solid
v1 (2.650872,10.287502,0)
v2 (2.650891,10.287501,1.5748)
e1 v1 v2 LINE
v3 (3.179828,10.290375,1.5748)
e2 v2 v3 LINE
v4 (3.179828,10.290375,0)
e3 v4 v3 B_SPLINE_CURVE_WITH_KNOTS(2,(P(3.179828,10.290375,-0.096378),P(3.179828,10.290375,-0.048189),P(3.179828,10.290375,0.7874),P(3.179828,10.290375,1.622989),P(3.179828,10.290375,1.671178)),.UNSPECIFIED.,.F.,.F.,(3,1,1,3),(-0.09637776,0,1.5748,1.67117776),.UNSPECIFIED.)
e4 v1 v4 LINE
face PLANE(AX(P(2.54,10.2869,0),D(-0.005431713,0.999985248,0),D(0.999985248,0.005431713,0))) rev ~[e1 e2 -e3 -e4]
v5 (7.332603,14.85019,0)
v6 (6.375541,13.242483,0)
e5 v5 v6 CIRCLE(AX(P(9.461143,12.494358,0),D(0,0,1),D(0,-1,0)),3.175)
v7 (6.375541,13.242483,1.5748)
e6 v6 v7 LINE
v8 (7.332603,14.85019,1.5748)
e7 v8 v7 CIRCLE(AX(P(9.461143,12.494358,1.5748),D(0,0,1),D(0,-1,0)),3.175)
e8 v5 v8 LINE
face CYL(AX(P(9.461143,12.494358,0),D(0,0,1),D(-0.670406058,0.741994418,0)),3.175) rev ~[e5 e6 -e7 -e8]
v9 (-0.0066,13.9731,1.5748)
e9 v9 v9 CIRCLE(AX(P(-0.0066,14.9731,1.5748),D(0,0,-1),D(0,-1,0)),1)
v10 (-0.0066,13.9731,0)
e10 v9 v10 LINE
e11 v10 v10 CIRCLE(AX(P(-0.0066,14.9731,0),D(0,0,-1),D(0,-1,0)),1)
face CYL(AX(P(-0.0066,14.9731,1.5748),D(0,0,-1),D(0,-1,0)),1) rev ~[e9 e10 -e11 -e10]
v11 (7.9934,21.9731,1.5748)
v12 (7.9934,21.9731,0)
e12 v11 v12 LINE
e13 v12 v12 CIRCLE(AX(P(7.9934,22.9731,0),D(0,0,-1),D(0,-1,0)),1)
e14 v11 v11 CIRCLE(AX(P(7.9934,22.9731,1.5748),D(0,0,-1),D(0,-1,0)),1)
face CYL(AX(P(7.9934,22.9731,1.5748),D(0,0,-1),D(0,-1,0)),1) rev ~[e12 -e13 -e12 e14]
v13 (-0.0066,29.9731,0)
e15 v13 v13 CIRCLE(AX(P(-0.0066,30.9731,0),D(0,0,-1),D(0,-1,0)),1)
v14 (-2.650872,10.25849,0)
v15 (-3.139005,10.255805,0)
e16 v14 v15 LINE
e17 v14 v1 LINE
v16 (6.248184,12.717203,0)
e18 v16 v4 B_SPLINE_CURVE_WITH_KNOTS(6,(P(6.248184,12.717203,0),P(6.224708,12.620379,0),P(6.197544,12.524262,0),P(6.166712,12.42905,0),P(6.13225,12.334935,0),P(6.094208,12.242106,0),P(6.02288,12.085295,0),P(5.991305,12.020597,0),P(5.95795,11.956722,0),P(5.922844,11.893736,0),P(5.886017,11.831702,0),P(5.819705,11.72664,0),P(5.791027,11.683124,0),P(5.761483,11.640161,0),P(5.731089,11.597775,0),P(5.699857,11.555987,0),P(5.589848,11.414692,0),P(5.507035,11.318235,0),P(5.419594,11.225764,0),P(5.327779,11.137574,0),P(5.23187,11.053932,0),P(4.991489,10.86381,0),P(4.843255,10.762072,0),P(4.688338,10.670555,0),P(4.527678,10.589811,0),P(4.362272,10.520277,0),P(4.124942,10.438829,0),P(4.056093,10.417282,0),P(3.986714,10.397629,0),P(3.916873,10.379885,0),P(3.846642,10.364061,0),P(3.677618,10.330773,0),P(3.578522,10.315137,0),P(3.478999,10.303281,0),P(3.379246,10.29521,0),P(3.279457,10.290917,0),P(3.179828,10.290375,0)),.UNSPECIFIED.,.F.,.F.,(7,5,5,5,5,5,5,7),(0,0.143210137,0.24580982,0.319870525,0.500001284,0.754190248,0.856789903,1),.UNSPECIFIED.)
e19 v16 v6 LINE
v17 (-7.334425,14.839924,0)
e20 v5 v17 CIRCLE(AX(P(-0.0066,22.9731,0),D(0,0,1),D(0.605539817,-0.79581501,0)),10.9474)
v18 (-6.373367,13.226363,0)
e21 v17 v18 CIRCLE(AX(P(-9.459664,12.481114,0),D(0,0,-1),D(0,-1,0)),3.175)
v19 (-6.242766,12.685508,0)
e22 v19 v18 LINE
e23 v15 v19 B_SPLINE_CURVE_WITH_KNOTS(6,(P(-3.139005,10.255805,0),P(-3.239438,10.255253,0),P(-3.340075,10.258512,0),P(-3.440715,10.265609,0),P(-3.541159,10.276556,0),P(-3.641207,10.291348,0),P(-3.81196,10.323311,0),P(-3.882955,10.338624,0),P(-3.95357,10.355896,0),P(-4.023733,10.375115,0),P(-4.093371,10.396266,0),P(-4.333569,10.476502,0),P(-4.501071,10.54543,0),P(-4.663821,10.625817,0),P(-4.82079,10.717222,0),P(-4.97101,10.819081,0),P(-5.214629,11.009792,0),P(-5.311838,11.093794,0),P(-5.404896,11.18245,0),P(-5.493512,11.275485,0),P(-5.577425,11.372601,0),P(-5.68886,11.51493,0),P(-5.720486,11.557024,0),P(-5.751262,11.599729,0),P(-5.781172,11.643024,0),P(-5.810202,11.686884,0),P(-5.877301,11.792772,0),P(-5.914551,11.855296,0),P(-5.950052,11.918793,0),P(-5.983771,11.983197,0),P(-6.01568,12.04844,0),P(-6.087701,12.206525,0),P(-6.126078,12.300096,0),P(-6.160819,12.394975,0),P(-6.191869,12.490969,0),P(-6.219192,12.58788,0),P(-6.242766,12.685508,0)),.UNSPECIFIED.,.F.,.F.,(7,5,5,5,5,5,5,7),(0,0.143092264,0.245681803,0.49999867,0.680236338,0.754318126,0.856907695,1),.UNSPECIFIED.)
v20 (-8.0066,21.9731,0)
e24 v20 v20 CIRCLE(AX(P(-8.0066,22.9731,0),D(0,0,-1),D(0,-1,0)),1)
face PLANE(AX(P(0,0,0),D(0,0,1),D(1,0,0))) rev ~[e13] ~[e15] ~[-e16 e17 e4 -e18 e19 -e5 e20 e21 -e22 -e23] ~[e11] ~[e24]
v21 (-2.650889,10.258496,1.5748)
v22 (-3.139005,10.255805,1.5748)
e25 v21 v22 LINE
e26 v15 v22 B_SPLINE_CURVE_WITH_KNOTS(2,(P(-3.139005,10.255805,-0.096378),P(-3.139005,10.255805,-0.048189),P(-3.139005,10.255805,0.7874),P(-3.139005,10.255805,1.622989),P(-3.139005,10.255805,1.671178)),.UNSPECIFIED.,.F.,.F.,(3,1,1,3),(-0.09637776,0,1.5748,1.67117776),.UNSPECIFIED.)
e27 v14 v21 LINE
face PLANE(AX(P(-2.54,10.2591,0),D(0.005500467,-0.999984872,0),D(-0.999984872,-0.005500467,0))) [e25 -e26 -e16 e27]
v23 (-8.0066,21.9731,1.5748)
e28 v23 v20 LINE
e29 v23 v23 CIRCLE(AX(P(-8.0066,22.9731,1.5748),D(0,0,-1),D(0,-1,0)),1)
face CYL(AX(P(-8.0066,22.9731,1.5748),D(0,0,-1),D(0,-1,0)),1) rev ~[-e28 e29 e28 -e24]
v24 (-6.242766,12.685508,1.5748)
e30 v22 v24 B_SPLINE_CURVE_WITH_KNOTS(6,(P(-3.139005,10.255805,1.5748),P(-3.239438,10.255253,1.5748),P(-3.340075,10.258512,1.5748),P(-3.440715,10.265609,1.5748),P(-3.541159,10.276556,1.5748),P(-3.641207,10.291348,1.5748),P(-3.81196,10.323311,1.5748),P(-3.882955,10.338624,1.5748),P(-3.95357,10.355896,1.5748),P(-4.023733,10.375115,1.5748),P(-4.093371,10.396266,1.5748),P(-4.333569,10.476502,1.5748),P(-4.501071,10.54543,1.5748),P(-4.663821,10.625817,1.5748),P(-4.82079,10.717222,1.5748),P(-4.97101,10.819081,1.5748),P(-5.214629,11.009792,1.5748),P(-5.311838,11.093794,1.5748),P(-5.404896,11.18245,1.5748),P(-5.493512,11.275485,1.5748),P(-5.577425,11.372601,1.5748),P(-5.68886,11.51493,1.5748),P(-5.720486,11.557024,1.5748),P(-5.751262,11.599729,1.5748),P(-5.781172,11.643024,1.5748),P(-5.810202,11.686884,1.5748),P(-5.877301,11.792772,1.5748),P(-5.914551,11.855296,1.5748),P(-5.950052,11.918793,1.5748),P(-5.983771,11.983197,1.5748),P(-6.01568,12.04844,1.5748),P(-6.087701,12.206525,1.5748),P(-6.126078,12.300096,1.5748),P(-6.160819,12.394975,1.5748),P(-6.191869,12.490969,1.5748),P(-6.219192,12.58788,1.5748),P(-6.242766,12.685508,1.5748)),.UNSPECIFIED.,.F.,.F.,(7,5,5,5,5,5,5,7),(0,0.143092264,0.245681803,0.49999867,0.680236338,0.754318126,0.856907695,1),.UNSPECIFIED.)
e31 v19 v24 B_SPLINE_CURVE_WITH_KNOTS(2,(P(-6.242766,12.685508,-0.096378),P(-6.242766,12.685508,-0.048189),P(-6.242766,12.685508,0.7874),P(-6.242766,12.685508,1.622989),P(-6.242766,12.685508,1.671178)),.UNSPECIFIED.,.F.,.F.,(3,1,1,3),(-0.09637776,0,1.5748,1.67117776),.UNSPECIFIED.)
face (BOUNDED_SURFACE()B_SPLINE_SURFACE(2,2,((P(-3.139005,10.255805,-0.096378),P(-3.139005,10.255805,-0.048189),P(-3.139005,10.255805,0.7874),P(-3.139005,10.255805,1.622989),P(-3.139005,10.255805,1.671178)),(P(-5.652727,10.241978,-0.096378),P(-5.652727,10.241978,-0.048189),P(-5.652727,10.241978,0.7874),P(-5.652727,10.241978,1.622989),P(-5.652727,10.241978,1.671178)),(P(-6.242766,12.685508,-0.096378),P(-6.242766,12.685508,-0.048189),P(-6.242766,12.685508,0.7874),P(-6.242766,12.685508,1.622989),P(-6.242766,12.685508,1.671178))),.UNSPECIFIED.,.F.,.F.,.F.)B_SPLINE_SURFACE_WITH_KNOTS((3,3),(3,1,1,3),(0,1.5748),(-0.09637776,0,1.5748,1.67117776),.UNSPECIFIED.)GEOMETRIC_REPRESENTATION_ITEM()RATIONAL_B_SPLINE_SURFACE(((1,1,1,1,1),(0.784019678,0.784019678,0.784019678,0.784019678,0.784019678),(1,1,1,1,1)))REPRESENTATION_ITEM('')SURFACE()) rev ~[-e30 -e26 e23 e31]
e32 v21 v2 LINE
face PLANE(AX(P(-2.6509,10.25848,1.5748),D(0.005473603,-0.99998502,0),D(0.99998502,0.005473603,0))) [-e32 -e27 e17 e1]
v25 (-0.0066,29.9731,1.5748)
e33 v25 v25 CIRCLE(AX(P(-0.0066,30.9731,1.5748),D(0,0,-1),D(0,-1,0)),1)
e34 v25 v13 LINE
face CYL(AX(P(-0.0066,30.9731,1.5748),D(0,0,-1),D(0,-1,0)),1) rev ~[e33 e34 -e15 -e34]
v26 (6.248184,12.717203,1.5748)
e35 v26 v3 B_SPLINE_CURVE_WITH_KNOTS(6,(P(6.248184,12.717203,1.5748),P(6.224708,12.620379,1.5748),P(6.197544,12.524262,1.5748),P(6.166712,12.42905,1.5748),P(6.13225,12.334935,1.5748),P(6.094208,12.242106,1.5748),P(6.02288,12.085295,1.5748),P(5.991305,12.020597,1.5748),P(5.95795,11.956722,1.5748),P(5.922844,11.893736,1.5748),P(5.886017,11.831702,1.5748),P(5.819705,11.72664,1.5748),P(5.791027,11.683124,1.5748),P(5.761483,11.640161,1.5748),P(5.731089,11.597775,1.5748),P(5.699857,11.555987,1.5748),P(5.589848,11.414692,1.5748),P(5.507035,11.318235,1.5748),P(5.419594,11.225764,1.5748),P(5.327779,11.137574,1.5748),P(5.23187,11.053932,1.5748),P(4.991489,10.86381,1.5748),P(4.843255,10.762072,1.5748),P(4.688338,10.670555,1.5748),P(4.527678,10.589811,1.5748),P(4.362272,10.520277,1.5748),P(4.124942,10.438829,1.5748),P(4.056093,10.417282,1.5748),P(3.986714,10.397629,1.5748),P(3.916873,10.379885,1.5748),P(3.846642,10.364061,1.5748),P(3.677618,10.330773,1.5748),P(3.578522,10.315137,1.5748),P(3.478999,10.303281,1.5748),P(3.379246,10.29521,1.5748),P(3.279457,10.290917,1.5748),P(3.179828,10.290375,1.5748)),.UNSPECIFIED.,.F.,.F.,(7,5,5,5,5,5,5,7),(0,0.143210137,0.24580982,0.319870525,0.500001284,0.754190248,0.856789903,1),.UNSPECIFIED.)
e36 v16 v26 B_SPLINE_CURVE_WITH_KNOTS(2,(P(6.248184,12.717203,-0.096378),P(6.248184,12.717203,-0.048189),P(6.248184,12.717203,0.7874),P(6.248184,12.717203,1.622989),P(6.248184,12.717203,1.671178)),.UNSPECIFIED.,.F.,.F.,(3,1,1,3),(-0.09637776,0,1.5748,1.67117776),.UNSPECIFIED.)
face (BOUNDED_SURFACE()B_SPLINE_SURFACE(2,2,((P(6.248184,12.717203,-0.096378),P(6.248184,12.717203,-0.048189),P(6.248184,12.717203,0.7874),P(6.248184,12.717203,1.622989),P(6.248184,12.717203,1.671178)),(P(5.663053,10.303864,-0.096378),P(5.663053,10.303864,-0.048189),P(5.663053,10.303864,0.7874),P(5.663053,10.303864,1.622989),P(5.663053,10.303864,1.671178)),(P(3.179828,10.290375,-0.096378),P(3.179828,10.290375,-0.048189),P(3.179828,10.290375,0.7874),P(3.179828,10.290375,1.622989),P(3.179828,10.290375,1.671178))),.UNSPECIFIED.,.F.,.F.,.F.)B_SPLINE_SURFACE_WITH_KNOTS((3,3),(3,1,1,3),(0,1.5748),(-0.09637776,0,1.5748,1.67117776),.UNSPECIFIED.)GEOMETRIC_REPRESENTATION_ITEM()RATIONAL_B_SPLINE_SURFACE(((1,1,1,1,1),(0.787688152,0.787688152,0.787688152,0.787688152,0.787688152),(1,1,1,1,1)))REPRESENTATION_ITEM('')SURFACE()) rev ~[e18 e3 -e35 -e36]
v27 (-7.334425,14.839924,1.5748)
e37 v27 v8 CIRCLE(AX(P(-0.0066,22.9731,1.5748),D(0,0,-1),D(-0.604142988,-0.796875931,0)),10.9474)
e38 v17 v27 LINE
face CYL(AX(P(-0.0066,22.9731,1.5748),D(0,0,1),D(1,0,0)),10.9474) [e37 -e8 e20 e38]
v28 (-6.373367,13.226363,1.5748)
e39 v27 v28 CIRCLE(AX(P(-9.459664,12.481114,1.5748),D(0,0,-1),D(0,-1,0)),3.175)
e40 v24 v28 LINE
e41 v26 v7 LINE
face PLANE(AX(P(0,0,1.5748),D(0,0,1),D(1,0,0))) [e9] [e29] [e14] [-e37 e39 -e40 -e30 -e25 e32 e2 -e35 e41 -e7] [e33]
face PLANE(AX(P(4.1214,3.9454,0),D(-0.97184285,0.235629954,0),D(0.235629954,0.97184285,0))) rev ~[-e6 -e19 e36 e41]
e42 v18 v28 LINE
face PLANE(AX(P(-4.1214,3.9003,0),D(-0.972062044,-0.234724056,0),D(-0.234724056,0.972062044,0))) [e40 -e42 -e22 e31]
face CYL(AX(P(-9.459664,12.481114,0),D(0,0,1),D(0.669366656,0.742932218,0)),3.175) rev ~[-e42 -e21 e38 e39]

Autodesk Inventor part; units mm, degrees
ref_plane "YZ Plane" through (0, 0, 0) normal (1, 0, 0) x (0, 1, 0)
ref_plane "XZ Plane" through (0, 0, 0) normal (0, 1, 0) x (-1, 0, 0)
ref_plane "XY Plane" through (0, 0, 0) normal (0, 0, 1) x (1, 0, 0)
sketch "Sketch1" plane through (0, 0, 0) normal (0, 0, 1) x (1, 0, 0)
  line L0 (-2.54, -8.19) -> (2.54, -8.19)
  line L1 (2.54, -8.19) -> (2.54, 8.19)
  line L2 (-2.54, 8.19) -> (-2.54, -8.19)
  line L3 (-2.54, -8.19) -> (2.54, 8.19) construction
  line L4 (2.54, -8.19) -> (-2.54, 8.19) construction
  circle A0 centre (0, 16.6545) radius 2.5 construction
  circle A1 centre (0, 16.6545) radius 5
  arc A2 (6.8029, 15.0051) -> (-6.8044, 15.0114) centre (0, 16.6545) ccw
  line L5 (-2.54, 8.19) -> (-2.54, 10.2591)
  line L6 (2.54, 8.19) -> (2.54, 10.2869)
  line L7 (0, 0) -> (0, 10.7842) construction
  line L8 (-2.54, 10.2591) -> (-3.9944, 10.2511)
  line L9 (2.54, 10.2869) -> (3.9944, 10.2948)
  line L10 (-3.9944, 10.2511) -> (-4.1214, 3.9003)
  line L11 (3.9944, 10.2948) -> (4.1214, 3.9454)
  line L12 (-4.1214, 3.9003) -> (-6.8044, 15.0114)
  line L13 (4.1214, 3.9454) -> (6.8029, 15.0051)
  line L14 (0, 0) -> (0, 22.9511) construction
  point P0 (-3.2672, 10.2551)
  dimension "d2" = 5
  dimension "d3" = 10
  dimension "d4" = 14
  dimension "d8" = 1.5815
  dimension "d9" = 1.5815
  dimension "d10" = 6.35
  dimension "d11" = 6.35
  dimension "d18" = 1.4545
  dimension "d19" = 1.4545
  dimension "d31" = 2.54
  dimension "d32" = 2.54
  dimension "d33" = 0
extrude "Plate1" add sketch "Sketch1" along normal blind 1.5748
sketch "Sketch2" plane through (0, 0, 0) normal (0, 0, -1) x (-1, 0, 0)
  circle A0 centre (0, 16.6545) radius 5 projected
  line L0 (-3.9944, 10.2948) -> (-4.1214, 3.9454) projected
  line L1 (-2.54, 10.2869) -> (-3.9944, 10.2948) projected
  line L2 (-2.54, -8.19) -> (-2.54, 10.2869) projected
  line L3 (2.54, -8.19) -> (-2.54, -8.19) projected
  line L4 (2.54, 10.2591) -> (2.54, -8.19) projected
  line L5 (3.9944, 10.2511) -> (2.54, 10.2591) projected
  line L6 (4.1214, 3.9003) -> (3.9944, 10.2511) projected
  line L7 (6.8044, 15.0114) -> (4.1214, 3.9003) projected
  arc A1 (6.8044, 15.0114) -> (-6.8029, 15.0051) centre (0, 16.6545) ccw projected
  line L8 (-4.1214, 3.9454) -> (-6.8029, 15.0051) projected
  line L9 (-1.5875, -17.19) -> (1.5875, -17.19)
  line L10 (1.5875, -17.19) -> (1.5875, 0.81)
  line L11 (1.5875, 0.81) -> (-1.5875, 0.81)
  line L12 (-1.5875, 0.81) -> (-1.5875, -17.19)
  line L13 (-1.5875, -17.19) -> (1.5875, 0.81) construction
  line L14 (1.5875, -17.19) -> (-1.5875, 0.81) construction
  point P0 (0, 0)
  point P1 (0, -8.19)
  dimension "d14" = 3.175
extrude "Extrusion1" cut sketch "Sketch2" against normal blind 25.4 contours L12 L11 L10 L3 | L3 L10 L9 L12
sketch "Sketch3" plane through (0, 0, 1.5748) normal (0, 0, 1) x (1, 0, 0)
  circle A0 centre (-37.757, 0) radius 3
  line L0 (-39.3445, -2.5456) -> (-36.1695, -2.5456)
  line L1 (-36.1695, -2.5456) -> (-36.1695, 2.5456)
  line L2 (-36.1695, 2.5456) -> (-39.3445, 2.5456)
  line L3 (-39.3445, 2.5456) -> (-39.3445, -2.5456)
  line L4 (-39.3445, -2.5456) -> (-36.1695, 2.5456) construction
  line L5 (-36.1695, -2.5456) -> (-39.3445, 2.5456) construction
  circle A1 centre (-37.757, 0) radius 4
  point P0 (0, 0)
  point P1 (-37.757, 3)
  point P2 (-37.757, 4)
  dimension "d35" = 8
  dimension "d28" = 6
  dimension "d29" = 3.175
  dimension "d30" = 5.0911
  dimension "d34" = 0.4545
  dimension "d36" = 1.4545
fillet "Fillet4" radius 0.381 6 edges at (-4.1214, 3.9003, 0.7874) (4.1214, 3.9454, 0.7874) (-2.54, -8.19, 0.7874) (-1.5875, -8.19, 0.7874) (1.5875, -8.19, 0.7874) (2.54, -8.19, 0.7874)
sketch "Sketch4" plane through (0, 0, 1.5748) normal (0, 0, 1) x (1, 0, 0)
  arc A0 (2.159, -8.19) -> (2.54, -7.809) centre (2.159, -7.809) ccw projected
  line L0 (2.54, 10.2869) -> (2.54, -7.809) projected
  line L1 (3.9944, 10.2948) -> (2.54, 10.2869) projected
  line L2 (4.0627, 6.8835) -> (3.9944, 10.2948) projected
  arc A1 (4.0627, 6.8835) -> (4.8139, 6.8013) centre (4.4436, 6.8911) ccw projected
  line L3 (6.8029, 15.0051) -> (4.8139, 6.8013) projected
  arc A2 (6.8029, 15.0051) -> (-6.8044, 15.0114) centre (0, 16.6545) ccw projected
  line L4 (-4.8137, 6.7674) -> (-6.8044, 15.0114) projected
  arc A3 (-4.8137, 6.7674) -> (-4.0625, 6.8492) centre (-4.4434, 6.8568) ccw projected
  line L5 (-3.9944, 10.2511) -> (-4.0625, 6.8492) projected
  line L6 (-2.54, 10.2591) -> (-3.9944, 10.2511) projected
  line L7 (-2.54, -7.809) -> (-2.54, 10.2591) projected
  arc A4 (-2.54, -7.809) -> (-2.159, -8.19) centre (-2.159, -7.809) ccw projected
  line L8 (-1.9685, -8.19) -> (-2.159, -8.19) projected
  arc A5 (-1.9685, -8.19) -> (-1.5875, -7.809) centre (-1.9685, -7.809) ccw projected
  line L9 (-1.5875, -7.809) -> (-1.5875, 0.81) projected
  line L10 (-1.5875, 0.81) -> (1.5875, 0.81) projected
  line L11 (1.5875, 0.81) -> (1.5875, -7.809) projected
  arc A6 (1.5875, -7.809) -> (1.9685, -8.19) centre (1.9685, -7.809) ccw projected
  line L12 (2.159, -8.19) -> (1.9685, -8.19) projected
  circle A7 centre (0, 16.6545) radius 5 projected
  point P0 (0, 0)
extrude "Extrusion2" add sketch "Sketch4" against normal up to surface (1.5748 mm away) contours A7
sketch "Sketch5" plane through (0, 0, 1.5748) normal (0, 0, 1) x (1, 0, 0)
  arc A0 (2.159, -8.19) -> (2.54, -7.809) centre (2.159, -7.809) ccw projected
  line L0 (2.54, 10.2869) -> (2.54, -7.809) projected
  line L1 (3.9944, 10.2948) -> (2.54, 10.2869) projected
  line L2 (4.0627, 6.8835) -> (3.9944, 10.2948) projected
  arc A1 (4.0627, 6.8835) -> (4.8139, 6.8013) centre (4.4436, 6.8911) ccw projected
  line L3 (6.8029, 15.0051) -> (4.8139, 6.8013) projected
  arc A2 (6.8029, 15.0051) -> (-6.8044, 15.0114) centre (0, 16.6545) ccw projected
  line L4 (-4.8137, 6.7674) -> (-6.8044, 15.0114) projected
  arc A3 (-4.8137, 6.7674) -> (-4.0625, 6.8492) centre (-4.4434, 6.8568) ccw projected
  line L5 (-3.9944, 10.2511) -> (-4.0625, 6.8492) projected
  line L6 (-2.54, 10.2591) -> (-3.9944, 10.2511) projected
  line L7 (-2.54, -7.809) -> (-2.54, 10.2591) projected
  arc A4 (-2.54, -7.809) -> (-2.159, -8.19) centre (-2.159, -7.809) ccw projected
  line L8 (-1.9685, -8.19) -> (-2.159, -8.19) projected
  arc A5 (-1.9685, -8.19) -> (-1.5875, -7.809) centre (-1.9685, -7.809) ccw projected
  line L9 (-1.5875, -7.809) -> (-1.5875, 0.81) projected
  line L10 (-1.5875, 0.81) -> (1.5875, 0.81) projected
  line L11 (1.5875, 0.81) -> (1.5875, -7.809) projected
  arc A6 (1.5875, -7.809) -> (1.9685, -8.19) centre (1.9685, -7.809) ccw projected
  line L12 (2.159, -8.19) -> (1.9685, -8.19) projected
  arc A7 (1.5644, 14.7045) -> (-1.5644, 14.7045) centre (0, 16.6545) ccw
  line L13 (1.5644, 14.7045) -> (-1.5644, 14.7045)
  point P0 (0, 0)
  point P1 (0, 19.1545)
  dimension "d40" = 5
  dimension "d44" = 4.45
extrude "Extrusion3" cut sketch "Sketch5" against normal blind 25.4 contours L13 A7
sketch "Sketch6" plane through (0, 0, 1.5748) normal (0, 0, 1) x (1, 0, 0)
  circle A0 centre (-0.0066, 22.9731) radius 10.9474
  line L0 (3.9944, 10.2948) -> (2.54, 10.2869) projected
  point P0 (0, 0)
  dimension "d45" = 21.8948
  dimension "d46" = 12.7
extrude "Extrusion4" add sketch "Sketch6" against normal up to surface (1.5748 mm away)
fillet "Fillet5" radius 3.175 2 edges at (-6.6204, 14.2495, 0.7874) (6.6225, 14.2611, 0.7874)
chamfer "Chamfer3" distance 3.175 angle 2 1 edges at (-2.54, 10.2591, 0.7874) measured on face at (-2.54, 4.2364, 0.5249)
chamfer "Chamfer4" distance 3.175 angle 2 1 edges at (2.54, 10.2869, 0.7874) measured on face at (2.54, -1.7771, 1.0499)
sketch "Sketch7" plane through (0, 0, 1.5748) normal (0, 0, 1) x (1, 0, 0)
  line L0 (-4.8137, 6.7674) -> (-6.3734, 13.2264) projected
  arc A0 (-4.8137, 6.7674) -> (-4.0625, 6.8492) centre (-4.4434, 6.8568) ccw projected
  line L1 (-3.9944, 10.2511) -> (-4.0625, 6.8492) projected
  line L2 (-2.6509, 10.2585) -> (-3.9944, 10.2511) projected
  line L3 (-2.54, 7.0841) -> (-2.6509, 10.2585) projected
  line L4 (-2.54, -7.809) -> (-2.54, 7.0841) projected
  arc A1 (-2.54, -7.809) -> (-2.159, -8.19) centre (-2.159, -7.809) ccw projected
  line L5 (-1.9685, -8.19) -> (-2.159, -8.19) projected
  arc A2 (-1.9685, -8.19) -> (-1.5875, -7.809) centre (-1.9685, -7.809) ccw projected
  line L6 (-1.5875, -7.809) -> (-1.5875, 0.81) projected
  line L7 (-1.5875, 0.81) -> (1.5875, 0.81) projected
  line L8 (1.5875, 0.81) -> (1.5875, -7.809) projected
  arc A3 (1.5875, -7.809) -> (1.9685, -8.19) centre (1.9685, -7.809) ccw projected
  line L9 (2.159, -8.19) -> (1.9685, -8.19) projected
  arc A4 (2.159, -8.19) -> (2.54, -7.809) centre (2.159, -7.809) ccw projected
  line L10 (2.54, 7.1119) -> (2.54, -7.809) projected
  line L11 (2.6509, 10.2875) -> (2.54, 7.1119) projected
  line L12 (3.9944, 10.2948) -> (2.6509, 10.2875) projected
  line L13 (4.0627, 6.8835) -> (3.9944, 10.2948) projected
  arc A5 (4.0627, 6.8835) -> (4.8139, 6.8013) centre (4.4436, 6.8911) ccw projected
  line L14 (6.3756, 13.2425) -> (4.8139, 6.8013) projected
  arc A6 (7.3326, 14.8503) -> (6.3756, 13.2425) centre (9.4612, 12.4944) ccw projected
  arc A7 (7.3326, 14.8503) -> (-7.3345, 14.84) centre (-0.0066, 22.9731) ccw projected
  arc A8 (-6.3734, 13.2264) -> (-7.3345, 14.84) centre (-9.4597, 12.4812) ccw projected
  circle A9 centre (-0.0066, 22.9731) radius 8
  point P0 (0, 0)
  point P1 (-0.0066, 14.9731)
  point P2 (-0.0066, 30.9731)
  point P3 (-8.0066, 22.9731)
  point P4 (7.9934, 22.9731)
  dimension "d56" = 16
hole "Hole1" at (-0.0066, 14.9731, 1.5748) at (-0.0066, 30.9731, 1.5748) at (-8.0066, 22.9731, 1.5748) at (7.9934, 22.9731, 1.5748) direction (0, 0, -1) diameter 2 end through all
sketch "Sketch8" plane through (0, 0, 1.5748) normal (0, 0, 1) x (1, 0, 0)
  circle A0 centre (-8.0066, 22.9731) radius 1 projected
  circle A1 centre (-0.0066, 14.9731) radius 1 projected
  circle A2 centre (-0.0066, 30.9731) radius 1 projected
  circle A3 centre (7.9934, 22.9731) radius 1 projected
  line L0 (-4.8137, 6.7674) -> (-6.3734, 13.2264) projected
  arc A4 (-4.8137, 6.7674) -> (-4.0625, 6.8492) centre (-4.4434, 6.8568) ccw projected
  line L1 (-3.9944, 10.2511) -> (-4.0625, 6.8492) projected
  line L2 (-2.6509, 10.2585) -> (-3.9944, 10.2511) projected
  line L3 (-2.54, 7.0841) -> (-2.6509, 10.2585) projected
  line L4 (-2.54, -7.809) -> (-2.54, 7.0841) projected
  arc A5 (-2.54, -7.809) -> (-2.159, -8.19) centre (-2.159, -7.809) ccw projected
  line L5 (-1.9685, -8.19) -> (-2.159, -8.19) projected
  arc A6 (-1.9685, -8.19) -> (-1.5875, -7.809) centre (-1.9685, -7.809) ccw projected
  line L6 (-1.5875, -7.809) -> (-1.5875, 0.81) projected
  line L7 (-1.5875, 0.81) -> (1.5875, 0.81) projected
  line L8 (1.5875, 0.81) -> (1.5875, -7.809) projected
  arc A7 (1.5875, -7.809) -> (1.9685, -8.19) centre (1.9685, -7.809) ccw projected
  line L9 (2.159, -8.19) -> (1.9685, -8.19) projected
  arc A8 (2.159, -8.19) -> (2.54, -7.809) centre (2.159, -7.809) ccw projected
  line L10 (2.54, 7.1119) -> (2.54, -7.809) projected
  line L11 (2.6509, 10.2875) -> (2.54, 7.1119) projected
  line L12 (3.9944, 10.2948) -> (2.6509, 10.2875) projected
  line L13 (4.0627, 6.8835) -> (3.9944, 10.2948) projected
  arc A9 (4.0627, 6.8835) -> (4.8139, 6.8013) centre (4.4436, 6.8911) ccw projected
  line L14 (6.3756, 13.2425) -> (4.8139, 6.8013) projected
  arc A10 (7.3326, 14.8503) -> (6.3756, 13.2425) centre (9.4612, 12.4944) ccw projected
  arc A11 (7.3326, 14.8503) -> (-7.3345, 14.84) centre (-0.0066, 22.9731) ccw projected
  arc A12 (-6.3734, 13.2264) -> (-7.3345, 14.84) centre (-9.4597, 12.4812) ccw projected
  line L15 (-15.0886, 10.1904) -> (17.7412, 10.3701)
  line L16 (17.7412, 10.3701) -> (17.8596, -11.273)
  line L17 (17.8596, -11.273) -> (-14.9701, -11.4526)
  line L18 (-14.9701, -11.4526) -> (-15.0886, 10.1904)
  point P0 (0, 0)
extrude "Extrusion5" cut sketch "Sketch8" against normal blind 25.4 contours A4 L1 L2 L3 L4 A5 L5 A6 L6 L7 L8 A7 L9 A8 L10 L11 L12 L13 A9 L14 L15 L16 L17 L18 L0 | L0 L15 L1 A4 | L15 L11 L10 A8 L9 A7 L8 L7 L6 A6 L5 A5 L4 L3 | L15 L14 A9 L13
fillet "Fillet6" radius 3.175 2 edges at (-5.6528, 10.2421, 0.7874) (5.6631, 10.304, 0.7874)
equation "\"d18\" = d36"
equation "\"d19\" = d36"
equation "\"d62\" = Thickness"
equation "\"BendRadius\" = Thickness"
equation "\"BendReliefWidth\" = Thickness"
equation "\"BendReliefDepth\" = 0.5 * Thickness"
equation "\"CornerReliefSize\" = 4 * Thickness"
equation "\"MinimumRemnant\" = 2 * Thickness"
equation "\"TransitionRadius\" = BendRadius"
equation "\"JacobiRadiusSize\" = BendRadius"
equation "\"GapSize\" = Thickness"
equation "\"d12\" = BendRadius"
equation "\"Thickness\" = 1.5748"
properties part number "8mm OD 6mm ID Rod End125DynamixelSpacer"
